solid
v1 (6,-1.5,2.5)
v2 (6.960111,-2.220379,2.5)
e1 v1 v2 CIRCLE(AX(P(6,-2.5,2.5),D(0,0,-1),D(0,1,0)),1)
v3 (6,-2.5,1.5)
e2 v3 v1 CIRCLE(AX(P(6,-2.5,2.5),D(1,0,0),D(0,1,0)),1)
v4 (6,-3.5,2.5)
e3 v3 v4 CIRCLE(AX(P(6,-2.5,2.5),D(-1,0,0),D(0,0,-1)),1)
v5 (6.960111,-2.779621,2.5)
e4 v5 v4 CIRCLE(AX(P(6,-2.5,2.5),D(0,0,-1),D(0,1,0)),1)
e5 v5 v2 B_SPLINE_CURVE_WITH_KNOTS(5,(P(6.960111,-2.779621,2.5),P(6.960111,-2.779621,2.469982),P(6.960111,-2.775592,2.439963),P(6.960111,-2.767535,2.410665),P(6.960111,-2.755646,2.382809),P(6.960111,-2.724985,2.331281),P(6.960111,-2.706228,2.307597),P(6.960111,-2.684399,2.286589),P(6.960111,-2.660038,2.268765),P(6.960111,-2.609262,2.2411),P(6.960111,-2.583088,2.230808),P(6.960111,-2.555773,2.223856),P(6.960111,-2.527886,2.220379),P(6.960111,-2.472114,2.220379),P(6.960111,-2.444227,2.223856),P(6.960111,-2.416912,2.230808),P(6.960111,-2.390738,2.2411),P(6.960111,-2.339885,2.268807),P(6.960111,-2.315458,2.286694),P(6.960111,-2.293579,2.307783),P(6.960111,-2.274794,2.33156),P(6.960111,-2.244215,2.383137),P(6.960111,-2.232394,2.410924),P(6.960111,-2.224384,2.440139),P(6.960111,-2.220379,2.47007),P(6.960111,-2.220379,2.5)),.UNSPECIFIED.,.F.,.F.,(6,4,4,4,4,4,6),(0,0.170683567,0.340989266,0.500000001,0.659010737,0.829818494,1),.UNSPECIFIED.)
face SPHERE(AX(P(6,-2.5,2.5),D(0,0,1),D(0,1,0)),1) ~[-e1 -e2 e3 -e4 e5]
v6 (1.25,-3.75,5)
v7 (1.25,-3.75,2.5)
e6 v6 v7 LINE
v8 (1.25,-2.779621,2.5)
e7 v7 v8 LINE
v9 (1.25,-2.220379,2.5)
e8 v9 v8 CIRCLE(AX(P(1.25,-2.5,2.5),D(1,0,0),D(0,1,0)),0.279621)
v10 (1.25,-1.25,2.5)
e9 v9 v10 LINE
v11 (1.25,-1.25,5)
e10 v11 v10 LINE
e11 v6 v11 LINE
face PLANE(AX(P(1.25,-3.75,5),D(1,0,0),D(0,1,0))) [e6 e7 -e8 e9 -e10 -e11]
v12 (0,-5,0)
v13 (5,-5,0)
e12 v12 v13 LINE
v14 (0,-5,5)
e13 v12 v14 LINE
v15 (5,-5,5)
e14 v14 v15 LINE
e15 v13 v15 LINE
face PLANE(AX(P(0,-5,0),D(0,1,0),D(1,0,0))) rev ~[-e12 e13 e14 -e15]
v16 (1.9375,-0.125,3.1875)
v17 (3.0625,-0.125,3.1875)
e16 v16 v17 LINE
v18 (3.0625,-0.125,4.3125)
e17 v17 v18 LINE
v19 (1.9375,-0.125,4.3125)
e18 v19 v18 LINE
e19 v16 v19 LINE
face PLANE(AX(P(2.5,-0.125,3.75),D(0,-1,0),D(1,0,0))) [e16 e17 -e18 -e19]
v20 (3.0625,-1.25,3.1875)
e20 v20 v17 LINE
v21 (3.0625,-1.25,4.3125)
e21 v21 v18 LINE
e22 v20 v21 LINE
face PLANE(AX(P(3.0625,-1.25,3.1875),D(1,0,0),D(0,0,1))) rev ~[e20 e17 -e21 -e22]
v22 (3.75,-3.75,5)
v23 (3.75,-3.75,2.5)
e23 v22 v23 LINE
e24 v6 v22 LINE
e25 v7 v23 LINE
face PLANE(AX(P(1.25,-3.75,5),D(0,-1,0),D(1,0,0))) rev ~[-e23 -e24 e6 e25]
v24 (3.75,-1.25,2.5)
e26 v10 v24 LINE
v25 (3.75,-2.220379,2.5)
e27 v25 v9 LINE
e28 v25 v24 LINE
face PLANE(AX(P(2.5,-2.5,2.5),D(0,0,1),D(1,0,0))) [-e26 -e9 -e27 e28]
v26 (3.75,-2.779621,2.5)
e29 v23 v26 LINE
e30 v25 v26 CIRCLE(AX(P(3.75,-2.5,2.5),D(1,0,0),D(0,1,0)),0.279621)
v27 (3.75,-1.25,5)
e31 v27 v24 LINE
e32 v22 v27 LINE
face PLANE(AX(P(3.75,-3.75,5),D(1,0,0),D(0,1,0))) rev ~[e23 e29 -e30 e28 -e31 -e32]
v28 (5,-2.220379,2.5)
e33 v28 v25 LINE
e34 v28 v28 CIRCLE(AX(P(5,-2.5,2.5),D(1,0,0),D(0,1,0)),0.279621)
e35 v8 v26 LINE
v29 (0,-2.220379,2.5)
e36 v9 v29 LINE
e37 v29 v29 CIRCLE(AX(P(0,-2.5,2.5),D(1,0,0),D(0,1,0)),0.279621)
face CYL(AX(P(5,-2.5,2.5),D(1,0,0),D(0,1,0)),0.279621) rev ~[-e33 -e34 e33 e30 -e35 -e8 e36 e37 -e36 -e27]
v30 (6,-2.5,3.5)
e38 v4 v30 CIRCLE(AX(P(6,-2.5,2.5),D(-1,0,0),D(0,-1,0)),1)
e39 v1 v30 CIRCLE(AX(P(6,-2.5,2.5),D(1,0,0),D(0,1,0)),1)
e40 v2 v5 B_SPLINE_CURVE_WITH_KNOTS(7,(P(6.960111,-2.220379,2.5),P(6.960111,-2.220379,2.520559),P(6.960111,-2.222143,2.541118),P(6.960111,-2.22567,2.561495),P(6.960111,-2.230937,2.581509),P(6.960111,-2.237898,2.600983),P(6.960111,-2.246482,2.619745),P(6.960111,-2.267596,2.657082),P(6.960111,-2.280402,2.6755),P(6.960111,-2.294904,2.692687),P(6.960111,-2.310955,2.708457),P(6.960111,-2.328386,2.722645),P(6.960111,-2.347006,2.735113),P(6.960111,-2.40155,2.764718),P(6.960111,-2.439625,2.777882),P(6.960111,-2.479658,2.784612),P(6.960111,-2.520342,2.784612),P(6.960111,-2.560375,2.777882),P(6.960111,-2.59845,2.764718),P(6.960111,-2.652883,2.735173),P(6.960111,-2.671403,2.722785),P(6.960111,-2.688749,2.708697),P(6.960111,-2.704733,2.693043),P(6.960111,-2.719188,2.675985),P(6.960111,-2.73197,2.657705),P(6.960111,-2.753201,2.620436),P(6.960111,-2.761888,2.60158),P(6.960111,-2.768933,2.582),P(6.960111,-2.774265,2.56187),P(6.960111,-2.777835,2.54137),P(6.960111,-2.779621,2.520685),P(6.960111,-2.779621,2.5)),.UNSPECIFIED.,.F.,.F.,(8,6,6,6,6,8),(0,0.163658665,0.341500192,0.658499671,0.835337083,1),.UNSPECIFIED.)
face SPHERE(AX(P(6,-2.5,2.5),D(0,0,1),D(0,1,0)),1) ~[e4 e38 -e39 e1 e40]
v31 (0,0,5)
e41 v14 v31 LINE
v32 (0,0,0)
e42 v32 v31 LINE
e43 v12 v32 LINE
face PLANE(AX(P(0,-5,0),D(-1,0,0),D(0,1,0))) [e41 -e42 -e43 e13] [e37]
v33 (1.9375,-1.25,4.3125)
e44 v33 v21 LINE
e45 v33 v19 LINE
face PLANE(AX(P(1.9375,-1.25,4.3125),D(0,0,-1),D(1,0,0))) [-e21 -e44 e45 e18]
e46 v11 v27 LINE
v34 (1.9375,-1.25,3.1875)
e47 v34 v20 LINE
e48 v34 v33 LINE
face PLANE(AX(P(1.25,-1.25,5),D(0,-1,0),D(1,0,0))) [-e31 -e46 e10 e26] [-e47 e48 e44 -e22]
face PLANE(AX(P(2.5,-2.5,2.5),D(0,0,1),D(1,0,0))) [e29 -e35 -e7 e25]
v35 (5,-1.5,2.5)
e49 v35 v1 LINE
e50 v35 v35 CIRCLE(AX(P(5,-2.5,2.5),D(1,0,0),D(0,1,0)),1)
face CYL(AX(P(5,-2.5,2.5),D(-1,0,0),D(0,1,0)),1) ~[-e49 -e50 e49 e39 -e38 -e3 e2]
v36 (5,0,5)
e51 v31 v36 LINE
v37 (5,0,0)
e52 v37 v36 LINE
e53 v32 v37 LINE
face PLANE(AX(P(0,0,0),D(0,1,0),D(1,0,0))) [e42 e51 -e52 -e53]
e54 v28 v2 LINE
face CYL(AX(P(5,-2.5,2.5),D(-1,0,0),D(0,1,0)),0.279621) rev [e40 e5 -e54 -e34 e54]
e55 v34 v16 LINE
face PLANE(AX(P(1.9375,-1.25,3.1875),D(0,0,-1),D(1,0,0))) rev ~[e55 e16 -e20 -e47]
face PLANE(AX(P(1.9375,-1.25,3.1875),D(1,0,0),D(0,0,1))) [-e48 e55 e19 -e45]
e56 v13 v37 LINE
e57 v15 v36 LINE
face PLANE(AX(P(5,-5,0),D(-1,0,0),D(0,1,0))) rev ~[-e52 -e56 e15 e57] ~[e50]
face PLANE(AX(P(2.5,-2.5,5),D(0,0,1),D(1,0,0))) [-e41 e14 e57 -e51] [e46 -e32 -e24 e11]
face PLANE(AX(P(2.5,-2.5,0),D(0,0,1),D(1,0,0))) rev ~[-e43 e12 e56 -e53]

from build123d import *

# Parameters (mm, degrees)
F0_W           = 5
F0_H           = 5
F2_DEPTH       = 5
F3_W           = 2.5
F3_H           = 2.5
F4_DEPTH       = 2.5
F5_W           = 1.125
F5_H           = 1.125
F6_DEPTH       = 1.125
F7_R           = 1
F8_DEPTH       = 1
F10_ANGLE      = 180
F11_R          = 0.2796205341
F12_DEPTH      = 25.4
F13_DEPTH      = 2
F13_DEPTH_BACK = 5


# Not quite as in the source:
# - the program builds the solid bodies; features that only make, move or delete a surface that nothing else refers to are left out


with BuildPart() as f2:
    # F0 (on Top) → F2 (new body)
    with BuildSketch(Plane.XY):
        with Locations((2.5, -2.5)):
            Rectangle(F0_W, F0_H)
    extrude(amount=F2_DEPTH)

    # F3 (on face) → F4 (cut)
    with BuildSketch(Plane.XY.offset(5)):
        with Locations((2.5, -2.5)):
            Rectangle(F3_W, F3_H)
    extrude(amount=-F4_DEPTH, mode=Mode.SUBTRACT)

    # F5 (on face) → F6 (cut)
    with BuildSketch(Plane.XZ.offset(1.25)):
        with Locations((2.5, 3.75)):
            Rectangle(F5_W, F5_H)
    extrude(amount=-F6_DEPTH, mode=Mode.SUBTRACT)

    # F7 (on face) → F8 (join)
    with BuildSketch(Plane.YZ.offset(5)):
        with Locations((-2.5, 2.5)):
            Circle(F7_R)
    extrude(amount=F8_DEPTH)

    # F9 (on face) → F10 (revolve)
    with BuildSketch(Plane.YZ.offset(6)):
        with BuildLine():
            ThreePointArc((-1.5, 2.5), (-1.7928932188, 3.2071067812), (-2.5, 3.5))
            Line((-2.5, 3.5), (-2.5, 1.5))
            ThreePointArc((-2.5, 1.5), (-1.7928932188, 1.7928932188), (-1.5, 2.5))
        make_face()
    revolve(axis=Axis((6, -2.5, 2.5), (0, 0, -1)), revolution_arc=F10_ANGLE)

    # F11 (on face) → F12 (cut)
    with BuildSketch(Plane.YZ.offset(5)):
        with Locations((-2.5, 2.5)):
            Circle(F11_R)
    extrude(amount=F12_DEPTH, mode=Mode.SUBTRACT)

    # F11 (on face) → F13 (cut, two sides)
    with BuildSketch(Plane.YZ.offset(5)) as f13_sk:
        with Locations((-2.5, 2.5)):
            Circle(F11_R)
    extrude(amount=F13_DEPTH, mode=Mode.SUBTRACT)
    extrude(f13_sk.sketch, amount=-F13_DEPTH_BACK, mode=Mode.SUBTRACT)


solid = f2.part
